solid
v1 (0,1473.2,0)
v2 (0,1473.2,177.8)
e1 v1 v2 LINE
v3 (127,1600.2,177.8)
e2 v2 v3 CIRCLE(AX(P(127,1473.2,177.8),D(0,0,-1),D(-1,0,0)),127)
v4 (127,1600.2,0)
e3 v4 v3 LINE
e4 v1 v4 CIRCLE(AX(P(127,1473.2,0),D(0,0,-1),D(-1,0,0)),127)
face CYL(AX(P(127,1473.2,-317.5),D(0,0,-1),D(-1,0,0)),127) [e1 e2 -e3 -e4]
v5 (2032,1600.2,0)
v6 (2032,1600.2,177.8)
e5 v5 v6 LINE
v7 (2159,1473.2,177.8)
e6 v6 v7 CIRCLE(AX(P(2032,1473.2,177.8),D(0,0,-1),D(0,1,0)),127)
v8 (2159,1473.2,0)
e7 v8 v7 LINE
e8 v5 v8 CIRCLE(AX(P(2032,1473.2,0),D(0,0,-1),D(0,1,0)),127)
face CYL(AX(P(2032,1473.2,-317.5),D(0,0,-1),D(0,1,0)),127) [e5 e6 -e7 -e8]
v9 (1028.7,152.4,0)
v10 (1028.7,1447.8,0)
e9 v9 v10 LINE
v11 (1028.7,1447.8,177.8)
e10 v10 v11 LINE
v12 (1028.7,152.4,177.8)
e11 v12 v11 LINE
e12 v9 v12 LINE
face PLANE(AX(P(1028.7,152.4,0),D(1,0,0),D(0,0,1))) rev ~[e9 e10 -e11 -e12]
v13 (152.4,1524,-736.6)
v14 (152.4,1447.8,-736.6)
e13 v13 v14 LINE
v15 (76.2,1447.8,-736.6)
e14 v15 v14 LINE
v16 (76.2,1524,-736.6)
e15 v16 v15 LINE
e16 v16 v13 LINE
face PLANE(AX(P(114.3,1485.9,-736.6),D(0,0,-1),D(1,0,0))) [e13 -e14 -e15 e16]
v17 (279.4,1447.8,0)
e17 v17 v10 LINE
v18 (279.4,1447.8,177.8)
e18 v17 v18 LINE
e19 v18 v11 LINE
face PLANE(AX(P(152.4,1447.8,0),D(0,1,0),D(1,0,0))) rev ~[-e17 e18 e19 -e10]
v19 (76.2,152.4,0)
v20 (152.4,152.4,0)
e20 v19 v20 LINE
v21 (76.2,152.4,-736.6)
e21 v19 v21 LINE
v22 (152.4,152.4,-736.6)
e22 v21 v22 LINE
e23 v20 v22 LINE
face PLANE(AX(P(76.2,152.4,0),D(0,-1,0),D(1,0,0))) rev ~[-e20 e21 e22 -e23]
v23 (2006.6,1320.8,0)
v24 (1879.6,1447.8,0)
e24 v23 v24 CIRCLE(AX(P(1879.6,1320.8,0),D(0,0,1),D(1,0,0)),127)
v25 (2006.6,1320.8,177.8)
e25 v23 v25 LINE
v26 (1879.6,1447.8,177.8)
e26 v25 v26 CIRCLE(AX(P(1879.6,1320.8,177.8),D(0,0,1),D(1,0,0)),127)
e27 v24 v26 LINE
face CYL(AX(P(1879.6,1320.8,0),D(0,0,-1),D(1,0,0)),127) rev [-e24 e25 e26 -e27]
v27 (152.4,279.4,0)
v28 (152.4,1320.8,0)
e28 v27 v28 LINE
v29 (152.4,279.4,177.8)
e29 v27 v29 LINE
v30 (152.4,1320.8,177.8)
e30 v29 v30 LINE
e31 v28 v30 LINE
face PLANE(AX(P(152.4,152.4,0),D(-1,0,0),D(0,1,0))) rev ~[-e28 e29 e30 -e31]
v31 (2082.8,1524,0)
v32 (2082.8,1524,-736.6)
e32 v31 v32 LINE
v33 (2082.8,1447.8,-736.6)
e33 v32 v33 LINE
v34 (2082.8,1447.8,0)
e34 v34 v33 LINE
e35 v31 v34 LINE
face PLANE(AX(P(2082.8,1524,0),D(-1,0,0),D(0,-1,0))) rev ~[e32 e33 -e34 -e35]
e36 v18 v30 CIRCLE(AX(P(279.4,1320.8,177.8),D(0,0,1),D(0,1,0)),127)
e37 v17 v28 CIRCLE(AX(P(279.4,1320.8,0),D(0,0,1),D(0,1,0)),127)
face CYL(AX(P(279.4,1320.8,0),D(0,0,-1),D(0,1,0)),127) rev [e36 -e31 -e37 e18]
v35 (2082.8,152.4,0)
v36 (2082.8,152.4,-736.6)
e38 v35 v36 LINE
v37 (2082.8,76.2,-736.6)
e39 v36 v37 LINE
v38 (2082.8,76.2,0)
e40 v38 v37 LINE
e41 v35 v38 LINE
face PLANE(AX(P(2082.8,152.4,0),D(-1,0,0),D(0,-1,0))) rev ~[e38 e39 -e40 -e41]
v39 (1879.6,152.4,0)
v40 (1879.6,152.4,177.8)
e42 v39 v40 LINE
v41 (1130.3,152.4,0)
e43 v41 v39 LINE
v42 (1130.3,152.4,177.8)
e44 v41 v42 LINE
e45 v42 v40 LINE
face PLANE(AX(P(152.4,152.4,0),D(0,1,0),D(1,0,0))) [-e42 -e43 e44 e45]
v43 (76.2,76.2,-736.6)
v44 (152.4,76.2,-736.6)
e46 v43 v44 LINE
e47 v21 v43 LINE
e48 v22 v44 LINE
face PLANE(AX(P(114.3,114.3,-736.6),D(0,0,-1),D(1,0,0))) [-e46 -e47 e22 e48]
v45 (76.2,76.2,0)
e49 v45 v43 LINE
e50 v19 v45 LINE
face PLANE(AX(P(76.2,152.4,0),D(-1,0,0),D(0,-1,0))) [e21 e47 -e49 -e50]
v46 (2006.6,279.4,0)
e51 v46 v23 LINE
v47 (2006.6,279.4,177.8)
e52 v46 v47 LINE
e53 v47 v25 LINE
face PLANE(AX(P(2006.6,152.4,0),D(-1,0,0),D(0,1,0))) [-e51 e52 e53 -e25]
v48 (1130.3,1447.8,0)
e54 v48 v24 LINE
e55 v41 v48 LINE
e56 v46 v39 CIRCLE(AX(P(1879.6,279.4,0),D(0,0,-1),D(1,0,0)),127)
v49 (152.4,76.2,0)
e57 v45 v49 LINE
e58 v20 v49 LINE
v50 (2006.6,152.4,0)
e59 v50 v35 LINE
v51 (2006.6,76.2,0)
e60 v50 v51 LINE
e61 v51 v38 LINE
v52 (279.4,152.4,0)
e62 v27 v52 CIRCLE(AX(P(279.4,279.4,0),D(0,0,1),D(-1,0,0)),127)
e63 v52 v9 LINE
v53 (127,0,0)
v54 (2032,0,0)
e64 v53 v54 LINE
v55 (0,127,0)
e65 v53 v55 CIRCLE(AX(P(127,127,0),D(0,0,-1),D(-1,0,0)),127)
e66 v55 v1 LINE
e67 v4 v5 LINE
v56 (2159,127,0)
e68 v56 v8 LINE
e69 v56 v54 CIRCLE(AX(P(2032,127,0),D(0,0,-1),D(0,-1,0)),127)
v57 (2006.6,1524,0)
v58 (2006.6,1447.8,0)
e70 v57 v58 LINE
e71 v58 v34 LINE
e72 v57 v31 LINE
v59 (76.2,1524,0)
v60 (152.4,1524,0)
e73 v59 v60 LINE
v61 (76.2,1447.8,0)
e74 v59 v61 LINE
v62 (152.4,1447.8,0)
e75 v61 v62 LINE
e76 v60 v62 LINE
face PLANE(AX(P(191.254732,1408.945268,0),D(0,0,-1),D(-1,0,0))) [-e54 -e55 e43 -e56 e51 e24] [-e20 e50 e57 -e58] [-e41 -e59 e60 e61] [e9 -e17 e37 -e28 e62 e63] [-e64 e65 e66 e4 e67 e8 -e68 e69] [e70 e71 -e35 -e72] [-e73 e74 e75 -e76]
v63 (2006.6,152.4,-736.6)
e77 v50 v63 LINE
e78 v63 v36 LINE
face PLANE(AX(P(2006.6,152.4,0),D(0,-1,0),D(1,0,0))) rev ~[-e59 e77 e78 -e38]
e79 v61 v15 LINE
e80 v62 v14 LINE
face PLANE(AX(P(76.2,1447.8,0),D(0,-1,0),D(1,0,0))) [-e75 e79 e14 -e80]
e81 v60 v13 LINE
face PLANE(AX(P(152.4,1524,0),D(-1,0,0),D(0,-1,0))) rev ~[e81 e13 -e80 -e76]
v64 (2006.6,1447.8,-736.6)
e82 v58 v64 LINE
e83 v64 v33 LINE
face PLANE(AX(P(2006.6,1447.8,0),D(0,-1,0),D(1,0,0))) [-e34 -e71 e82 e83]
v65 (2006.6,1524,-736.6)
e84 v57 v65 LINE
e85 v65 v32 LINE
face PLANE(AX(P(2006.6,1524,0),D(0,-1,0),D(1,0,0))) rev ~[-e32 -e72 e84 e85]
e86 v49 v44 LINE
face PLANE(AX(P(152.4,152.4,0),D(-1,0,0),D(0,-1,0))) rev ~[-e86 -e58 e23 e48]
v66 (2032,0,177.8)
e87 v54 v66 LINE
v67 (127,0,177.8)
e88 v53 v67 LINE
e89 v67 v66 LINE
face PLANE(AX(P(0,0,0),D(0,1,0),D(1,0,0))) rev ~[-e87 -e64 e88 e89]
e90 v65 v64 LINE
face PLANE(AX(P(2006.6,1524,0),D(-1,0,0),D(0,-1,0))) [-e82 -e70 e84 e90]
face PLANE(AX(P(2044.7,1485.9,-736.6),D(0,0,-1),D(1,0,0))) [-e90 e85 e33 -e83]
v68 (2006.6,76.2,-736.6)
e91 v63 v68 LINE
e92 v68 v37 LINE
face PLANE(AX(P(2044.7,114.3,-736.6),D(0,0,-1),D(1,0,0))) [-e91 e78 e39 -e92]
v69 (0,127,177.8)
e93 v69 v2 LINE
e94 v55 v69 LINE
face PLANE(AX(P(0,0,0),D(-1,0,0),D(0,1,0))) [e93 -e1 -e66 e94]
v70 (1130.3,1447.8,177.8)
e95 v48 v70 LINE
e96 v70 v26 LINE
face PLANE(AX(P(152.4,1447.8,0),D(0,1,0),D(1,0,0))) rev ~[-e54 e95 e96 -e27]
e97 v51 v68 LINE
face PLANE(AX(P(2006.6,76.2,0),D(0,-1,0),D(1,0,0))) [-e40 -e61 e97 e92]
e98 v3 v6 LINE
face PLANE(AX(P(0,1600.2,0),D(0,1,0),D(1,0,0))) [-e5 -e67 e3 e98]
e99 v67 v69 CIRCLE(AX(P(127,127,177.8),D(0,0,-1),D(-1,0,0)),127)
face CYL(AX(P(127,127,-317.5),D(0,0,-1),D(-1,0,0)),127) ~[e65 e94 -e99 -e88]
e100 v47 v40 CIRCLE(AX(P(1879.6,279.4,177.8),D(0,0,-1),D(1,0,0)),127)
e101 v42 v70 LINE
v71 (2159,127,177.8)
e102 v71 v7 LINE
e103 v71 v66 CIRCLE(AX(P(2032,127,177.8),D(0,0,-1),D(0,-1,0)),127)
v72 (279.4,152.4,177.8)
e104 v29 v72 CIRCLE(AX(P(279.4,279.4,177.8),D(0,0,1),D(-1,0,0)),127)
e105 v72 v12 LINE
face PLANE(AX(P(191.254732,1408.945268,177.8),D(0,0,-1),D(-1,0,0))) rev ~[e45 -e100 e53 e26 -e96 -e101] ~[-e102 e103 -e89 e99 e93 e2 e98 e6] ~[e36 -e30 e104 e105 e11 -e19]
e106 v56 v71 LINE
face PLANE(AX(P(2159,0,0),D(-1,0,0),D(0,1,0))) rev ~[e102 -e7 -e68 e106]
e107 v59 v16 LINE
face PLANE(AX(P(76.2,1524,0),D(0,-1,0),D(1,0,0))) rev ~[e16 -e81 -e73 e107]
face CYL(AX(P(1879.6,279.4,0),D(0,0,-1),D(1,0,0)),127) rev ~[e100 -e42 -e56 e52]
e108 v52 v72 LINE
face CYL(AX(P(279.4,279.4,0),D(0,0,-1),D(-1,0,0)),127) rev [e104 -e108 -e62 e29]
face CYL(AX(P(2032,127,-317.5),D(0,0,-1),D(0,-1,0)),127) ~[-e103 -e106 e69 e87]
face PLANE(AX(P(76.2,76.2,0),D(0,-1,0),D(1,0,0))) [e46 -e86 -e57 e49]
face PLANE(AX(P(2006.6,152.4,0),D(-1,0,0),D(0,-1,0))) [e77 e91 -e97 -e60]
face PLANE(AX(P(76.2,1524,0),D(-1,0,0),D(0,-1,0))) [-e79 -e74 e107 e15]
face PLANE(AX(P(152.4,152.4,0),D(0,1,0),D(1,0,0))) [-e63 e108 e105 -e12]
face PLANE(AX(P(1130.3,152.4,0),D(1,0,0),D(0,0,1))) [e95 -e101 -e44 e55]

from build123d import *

# Parameters (mm, degrees)
F0_W        = 2159
F0_H        = 1600.2
F0_W_2      = 1854.2
F0_H_2      = 1295.4
F1_DEPTH    = 177.8
F2_W        = 76.2
F2_H        = 76.2
F3_DEPTH    = 736.6
F4_T1_DEPTH = 177.8
F4_T3_DEPTH = 812.8
F5_W        = 101.6
F5_H        = 177.8
F6_DEPTH    = 1295.4


# Not quite as in the source:
# - a fillet or chamfer that OpenCascade refuses, or shapes differently, is made with other operations: its cross-section is extruded or revolved along the edge and cut away or added


with BuildPart() as f1:
    # F0 (on Top) → F1 (new body)
    with BuildSketch(Plane.XY):
        with Locations((1079.5, 800.1)):
            Rectangle(F0_W, F0_H)
        with Locations((1079.5, 800.1)):
            Rectangle(F0_W_2, F0_H_2, mode=Mode.SUBTRACT)
    extrude(amount=F1_DEPTH)

    # F2 (on face) → F3 (join)
    with BuildSketch(Plane(origin=(0, 0, 0), x_dir=(1, 0, 0), z_dir=(0, 0, -1))):
        with Locations((114.3, -114.3)):
            Rectangle(F2_W, F2_H)
        with Locations((2044.7, -114.3)):
            Rectangle(F2_W, F2_H)
        with Locations((2044.7, -1485.9)):
            Rectangle(F2_W, F2_H)
        with Locations((114.3, -1485.9)):
            Rectangle(F2_W, F2_H)
    extrude(amount=F3_DEPTH)

    # F4: fillet of radius 127 on 8 edges, made by hand

    # F4_s2 → F4_t1 (join)
    with BuildSketch(Plane.XY):
        with BuildLine():
            ThreePointArc((279.4, 1447.8), (189.5974387893, 1410.6025612107), (152.4, 1320.8))
            Line((152.4, 1320.8), (152.4, 1447.8))
            Line((152.4, 1447.8), (279.4, 1447.8))
        make_face()
        with BuildLine():
            ThreePointArc((2006.6, 1320.8), (1969.4025612107, 1410.6025612107), (1879.6, 1447.8))
            Line((1879.6, 1447.8), (2006.6, 1447.8))
            Line((2006.6, 1447.8), (2006.6, 1320.8))
        make_face()
        with BuildLine():
            ThreePointArc((2006.6, 279.4), (1969.4025612107, 189.5974387893), (1879.6, 152.4))
            Line((1879.6, 152.4), (2006.6, 152.4))
            Line((2006.6, 152.4), (2006.6, 279.4))
        make_face()
        with BuildLine():
            ThreePointArc((152.4, 279.4), (189.5974387893, 189.5974387893), (279.4, 152.4))
            Line((279.4, 152.4), (152.4, 152.4))
            Line((152.4, 152.4), (152.4, 279.4))
        make_face()
    extrude(amount=F4_T1_DEPTH)

    # F4_s4 → F4_t3 (cut)
    with BuildSketch(Plane.XY.offset(-317.5)):
        with BuildLine():
            ThreePointArc((0, 127), (37.1974387893, 37.1974387893), (127, 0))
            Line((127, 0), (0, 0))
            Line((0, 0), (0, 127))
        make_face()
        with BuildLine():
            ThreePointArc((0, 1473.2), (37.1974387893, 1563.0025612107), (127, 1600.2))
            Line((127, 1600.2), (0, 1600.2))
            Line((0, 1600.2), (0, 1473.2))
        make_face()
        with BuildLine():
            ThreePointArc((2032, 0), (2121.8025612107, 37.1974387893), (2159, 127))
            Line((2159, 127), (2159, 0))
            Line((2159, 0), (2032, 0))
        make_face()
        with BuildLine():
            ThreePointArc((2032, 1600.2), (2121.8025612107, 1563.0025612107), (2159, 1473.2))
            Line((2159, 1473.2), (2159, 1600.2))
            Line((2159, 1600.2), (2032, 1600.2))
        make_face()
    extrude(amount=F4_T3_DEPTH, mode=Mode.SUBTRACT)

    # F5 (on face) → F6 (join, through all)
    with BuildSketch(Plane(origin=(0, 152.4, 0), x_dir=(-1, 0, 0), z_dir=(0, 1, 0))):
        with Locations((-1079.5, 88.9)):
            Rectangle(F5_W, F5_H)
    extrude(amount=F6_DEPTH)


solid = f1.part
